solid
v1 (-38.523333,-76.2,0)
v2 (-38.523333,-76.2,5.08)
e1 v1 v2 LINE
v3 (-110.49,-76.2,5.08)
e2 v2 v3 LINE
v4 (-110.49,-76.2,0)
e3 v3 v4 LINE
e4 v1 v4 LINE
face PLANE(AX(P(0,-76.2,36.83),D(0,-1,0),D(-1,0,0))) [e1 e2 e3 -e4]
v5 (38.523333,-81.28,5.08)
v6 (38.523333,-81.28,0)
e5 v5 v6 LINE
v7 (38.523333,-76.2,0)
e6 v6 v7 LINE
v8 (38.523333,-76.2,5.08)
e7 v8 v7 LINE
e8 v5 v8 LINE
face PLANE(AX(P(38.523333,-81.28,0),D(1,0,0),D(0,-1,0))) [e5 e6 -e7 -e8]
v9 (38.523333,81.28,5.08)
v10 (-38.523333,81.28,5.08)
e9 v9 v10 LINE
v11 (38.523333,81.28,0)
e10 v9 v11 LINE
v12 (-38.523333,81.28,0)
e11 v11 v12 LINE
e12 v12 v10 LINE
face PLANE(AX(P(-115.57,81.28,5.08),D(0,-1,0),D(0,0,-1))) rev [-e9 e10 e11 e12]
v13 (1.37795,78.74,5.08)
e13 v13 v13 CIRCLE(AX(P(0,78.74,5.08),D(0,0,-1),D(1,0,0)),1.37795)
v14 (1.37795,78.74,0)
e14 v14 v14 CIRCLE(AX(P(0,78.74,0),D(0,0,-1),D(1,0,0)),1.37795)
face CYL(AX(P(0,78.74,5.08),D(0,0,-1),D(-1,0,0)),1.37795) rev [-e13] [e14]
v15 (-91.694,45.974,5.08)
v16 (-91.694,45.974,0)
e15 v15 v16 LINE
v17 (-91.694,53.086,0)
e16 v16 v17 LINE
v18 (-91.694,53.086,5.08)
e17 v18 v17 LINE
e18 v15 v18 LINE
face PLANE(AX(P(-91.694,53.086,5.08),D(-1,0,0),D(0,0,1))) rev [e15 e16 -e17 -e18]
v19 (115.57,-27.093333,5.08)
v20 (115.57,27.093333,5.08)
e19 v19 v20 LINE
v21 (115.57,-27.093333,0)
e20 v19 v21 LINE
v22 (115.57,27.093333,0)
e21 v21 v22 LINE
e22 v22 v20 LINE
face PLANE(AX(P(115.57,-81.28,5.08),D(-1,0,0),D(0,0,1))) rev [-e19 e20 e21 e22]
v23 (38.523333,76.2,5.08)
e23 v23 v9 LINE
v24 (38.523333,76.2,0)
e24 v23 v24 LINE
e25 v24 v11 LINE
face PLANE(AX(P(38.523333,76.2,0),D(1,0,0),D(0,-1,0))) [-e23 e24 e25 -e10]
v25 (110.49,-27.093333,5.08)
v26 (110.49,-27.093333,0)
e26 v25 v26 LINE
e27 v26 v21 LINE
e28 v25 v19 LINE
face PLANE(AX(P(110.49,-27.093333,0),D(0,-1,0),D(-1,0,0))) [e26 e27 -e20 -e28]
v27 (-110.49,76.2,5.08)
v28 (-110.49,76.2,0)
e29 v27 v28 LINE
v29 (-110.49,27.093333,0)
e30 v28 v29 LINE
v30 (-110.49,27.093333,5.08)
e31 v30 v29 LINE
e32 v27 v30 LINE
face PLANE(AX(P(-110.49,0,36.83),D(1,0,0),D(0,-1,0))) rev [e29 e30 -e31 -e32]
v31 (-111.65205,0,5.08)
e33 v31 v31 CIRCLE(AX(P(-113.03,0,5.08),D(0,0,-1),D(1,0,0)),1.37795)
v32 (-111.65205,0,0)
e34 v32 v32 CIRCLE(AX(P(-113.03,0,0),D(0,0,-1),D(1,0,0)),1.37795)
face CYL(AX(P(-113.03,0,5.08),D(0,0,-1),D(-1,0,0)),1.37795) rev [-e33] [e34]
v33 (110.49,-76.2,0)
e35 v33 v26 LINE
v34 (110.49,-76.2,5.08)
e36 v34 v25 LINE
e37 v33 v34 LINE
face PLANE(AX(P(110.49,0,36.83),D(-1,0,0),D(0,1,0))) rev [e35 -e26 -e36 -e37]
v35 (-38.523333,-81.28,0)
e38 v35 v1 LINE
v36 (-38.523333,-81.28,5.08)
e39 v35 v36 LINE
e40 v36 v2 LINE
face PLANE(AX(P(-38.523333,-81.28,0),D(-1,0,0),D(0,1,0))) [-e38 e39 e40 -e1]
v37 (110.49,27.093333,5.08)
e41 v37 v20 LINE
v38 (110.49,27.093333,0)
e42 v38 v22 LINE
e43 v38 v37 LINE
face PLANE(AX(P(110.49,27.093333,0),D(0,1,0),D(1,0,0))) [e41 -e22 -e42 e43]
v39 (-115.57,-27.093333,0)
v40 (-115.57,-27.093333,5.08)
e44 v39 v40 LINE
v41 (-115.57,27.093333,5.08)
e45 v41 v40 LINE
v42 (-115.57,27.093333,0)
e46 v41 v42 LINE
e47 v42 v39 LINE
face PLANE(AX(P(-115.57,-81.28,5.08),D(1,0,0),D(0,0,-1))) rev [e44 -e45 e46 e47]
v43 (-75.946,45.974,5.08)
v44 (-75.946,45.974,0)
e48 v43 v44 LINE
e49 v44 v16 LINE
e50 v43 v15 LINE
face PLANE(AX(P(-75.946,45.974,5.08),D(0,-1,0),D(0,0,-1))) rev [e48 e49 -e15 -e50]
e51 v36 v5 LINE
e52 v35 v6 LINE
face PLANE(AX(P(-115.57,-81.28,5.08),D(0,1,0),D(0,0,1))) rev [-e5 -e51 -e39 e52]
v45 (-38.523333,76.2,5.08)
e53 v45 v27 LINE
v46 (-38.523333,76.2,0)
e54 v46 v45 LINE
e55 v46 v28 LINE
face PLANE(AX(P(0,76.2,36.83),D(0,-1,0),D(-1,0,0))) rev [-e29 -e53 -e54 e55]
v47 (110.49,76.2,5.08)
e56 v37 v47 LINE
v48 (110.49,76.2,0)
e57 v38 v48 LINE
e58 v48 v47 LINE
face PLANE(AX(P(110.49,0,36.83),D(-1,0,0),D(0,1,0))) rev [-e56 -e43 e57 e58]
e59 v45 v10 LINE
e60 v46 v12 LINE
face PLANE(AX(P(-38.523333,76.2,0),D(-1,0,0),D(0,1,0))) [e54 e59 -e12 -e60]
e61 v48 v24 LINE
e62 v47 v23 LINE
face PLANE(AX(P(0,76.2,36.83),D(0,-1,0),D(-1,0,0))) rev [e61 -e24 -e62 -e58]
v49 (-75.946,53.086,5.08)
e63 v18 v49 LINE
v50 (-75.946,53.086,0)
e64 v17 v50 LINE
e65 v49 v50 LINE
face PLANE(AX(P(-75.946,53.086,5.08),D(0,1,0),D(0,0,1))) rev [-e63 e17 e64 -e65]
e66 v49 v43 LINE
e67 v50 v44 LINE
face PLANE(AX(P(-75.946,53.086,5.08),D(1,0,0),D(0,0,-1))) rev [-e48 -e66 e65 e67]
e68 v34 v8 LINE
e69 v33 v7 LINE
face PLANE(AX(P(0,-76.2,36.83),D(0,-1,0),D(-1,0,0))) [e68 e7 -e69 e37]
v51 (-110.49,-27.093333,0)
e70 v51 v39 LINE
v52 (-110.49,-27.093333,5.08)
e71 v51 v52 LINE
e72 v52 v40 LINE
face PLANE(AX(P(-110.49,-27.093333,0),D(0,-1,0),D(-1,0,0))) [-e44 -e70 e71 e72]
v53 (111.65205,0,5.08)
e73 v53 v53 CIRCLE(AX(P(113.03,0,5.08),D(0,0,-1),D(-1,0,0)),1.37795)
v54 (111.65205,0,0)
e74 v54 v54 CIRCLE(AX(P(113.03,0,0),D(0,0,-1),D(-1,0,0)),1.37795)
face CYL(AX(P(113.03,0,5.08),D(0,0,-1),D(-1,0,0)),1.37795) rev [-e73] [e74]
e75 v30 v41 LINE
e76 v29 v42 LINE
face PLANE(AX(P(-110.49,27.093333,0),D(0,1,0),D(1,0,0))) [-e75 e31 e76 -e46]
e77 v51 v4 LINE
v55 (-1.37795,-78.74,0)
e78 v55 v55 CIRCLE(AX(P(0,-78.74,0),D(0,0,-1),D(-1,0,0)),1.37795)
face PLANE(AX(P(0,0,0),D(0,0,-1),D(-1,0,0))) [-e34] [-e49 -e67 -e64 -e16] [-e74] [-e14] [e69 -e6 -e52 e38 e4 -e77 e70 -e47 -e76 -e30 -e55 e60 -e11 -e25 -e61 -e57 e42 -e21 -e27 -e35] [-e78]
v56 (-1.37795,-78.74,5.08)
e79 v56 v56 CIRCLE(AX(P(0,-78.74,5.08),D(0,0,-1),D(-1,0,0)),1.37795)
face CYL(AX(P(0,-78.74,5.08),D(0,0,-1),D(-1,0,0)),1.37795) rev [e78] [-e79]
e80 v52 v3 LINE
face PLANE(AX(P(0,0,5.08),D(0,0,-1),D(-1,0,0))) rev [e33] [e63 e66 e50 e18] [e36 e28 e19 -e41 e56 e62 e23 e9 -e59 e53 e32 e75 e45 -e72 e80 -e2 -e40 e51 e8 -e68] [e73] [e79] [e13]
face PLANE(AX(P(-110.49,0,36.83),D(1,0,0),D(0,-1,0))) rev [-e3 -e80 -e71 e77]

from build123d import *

# Parameters (mm, degrees)
SKETCH1_W           = 231.14
SKETCH1_H           = 162.56
BOSS_EXTRUDE1_DEPTH = 5.08
SKETCH2_R           = 1.37795
CUT_EXTRUDE1_DEPTH  = 142.381291902
CAVITY2_START       = -81.28
CAVITY2_OUTLINE_W   = 77.046666667
CAVITY2_OUTLINE_H   = 5.08
CAVITY2_DEPTH       = 5.08
CAVITY2_START_2     = 76.2
CAVITY2_2_OUTLINE_W = 77.046666667
CAVITY2_2_OUTLINE_H = 5.08
CAVITY2_2_DEPTH     = 5.08
CAVITY2_START_3     = -76.2
CAVITY2_3_OUTLINE_W = 5.08
CAVITY2_3_OUTLINE_H = 5.08
CAVITY2_3_DEPTH     = 49.106666667
CAVITY2_START_4     = 27.093333333
CAVITY2_4_OUTLINE_W = 5.08
CAVITY2_4_OUTLINE_H = 5.08
CAVITY2_4_DEPTH     = 49.106666667
SKETCH3_W           = 15.748
SKETCH3_H           = 7.112
CUT_EXTRUDE2_DEPTH  = 142.381291902


# Read off the part's stored shape, not the designer's step: Cavity2
with BuildPart() as part:
    # Sketch1 → Boss-Extrude1 (new body)
    with BuildSketch(Plane.XY):
        Rectangle(SKETCH1_W, SKETCH1_H)
    extrude(amount=BOSS_EXTRUDE1_DEPTH)

    # Sketch2 → Cut-Extrude1 (cut, through all)
    with BuildSketch(Plane(origin=(0, 0, 0), x_dir=(-1, 0, 0), z_dir=(0, 0, -1))):
        with Locations((-113.03, 0)):
            Circle(SKETCH2_R)
        with Locations(Location((0, 78.74, 0), (0, 0, 180))):
            Circle(SKETCH2_R)
        with Locations(Location((113.03, 0, 0), (0, 0, 180))):
            Circle(SKETCH2_R)
        with Locations((0, -78.74)):
            Circle(SKETCH2_R)
    extrude(amount=-CUT_EXTRUDE1_DEPTH, mode=Mode.SUBTRACT)

    # Cavity2 outline → Cavity2 (cut)
    with BuildSketch(Plane(origin=(0, 0, 0), x_dir=(1, 0, 0), z_dir=(0, 1, 0)).offset(CAVITY2_START)):
        with Locations((-77.046666667, -2.54)):
            Rectangle(CAVITY2_OUTLINE_W, CAVITY2_OUTLINE_H)
        with Locations((77.046666667, -2.54)):
            Rectangle(CAVITY2_OUTLINE_W, CAVITY2_OUTLINE_H)
    extrude(amount=CAVITY2_DEPTH, mode=Mode.SUBTRACT)

    # Cavity2 2 outline → Cavity2 2 (cut)
    with BuildSketch(Plane(origin=(0, 0, 0), x_dir=(1, 0, 0), z_dir=(0, 1, 0)).offset(CAVITY2_START_2)):
        with Locations((-77.046666667, -2.54)):
            Rectangle(CAVITY2_2_OUTLINE_W, CAVITY2_2_OUTLINE_H)
        with Locations((77.046666667, -2.54)):
            Rectangle(CAVITY2_2_OUTLINE_W, CAVITY2_2_OUTLINE_H)
    extrude(amount=CAVITY2_2_DEPTH, mode=Mode.SUBTRACT)

    # Cavity2 3 outline → Cavity2 3 (cut)
    with BuildSketch(Plane(origin=(0, 0, 0), x_dir=(1, 0, 0), z_dir=(0, 1, 0)).offset(CAVITY2_START_3)):
        with Locations((-113.03, -2.54)):
            Rectangle(CAVITY2_3_OUTLINE_W, CAVITY2_3_OUTLINE_H)
        with Locations((113.03, -2.54)):
            Rectangle(CAVITY2_3_OUTLINE_W, CAVITY2_3_OUTLINE_H)
    extrude(amount=CAVITY2_3_DEPTH, mode=Mode.SUBTRACT)

    # Cavity2 4 outline → Cavity2 4 (cut)
    with BuildSketch(Plane(origin=(0, 0, 0), x_dir=(1, 0, 0), z_dir=(0, 1, 0)).offset(CAVITY2_START_4)):
        with Locations((-113.03, -2.54)):
            Rectangle(CAVITY2_4_OUTLINE_W, CAVITY2_4_OUTLINE_H)
        with Locations((113.03, -2.54)):
            Rectangle(CAVITY2_4_OUTLINE_W, CAVITY2_4_OUTLINE_H)
    extrude(amount=CAVITY2_4_DEPTH, mode=Mode.SUBTRACT)

    # Sketch3 → Cut-Extrude2 (cut, through all)
    with BuildSketch(Plane(origin=(0, 0, 0), x_dir=(-1, 0, 0), z_dir=(0, 0, -1))):
        with Locations((83.82, 49.53)):
            Rectangle(SKETCH3_W, SKETCH3_H)
    extrude(amount=-CUT_EXTRUDE2_DEPTH, mode=Mode.SUBTRACT)


solid = part.part
